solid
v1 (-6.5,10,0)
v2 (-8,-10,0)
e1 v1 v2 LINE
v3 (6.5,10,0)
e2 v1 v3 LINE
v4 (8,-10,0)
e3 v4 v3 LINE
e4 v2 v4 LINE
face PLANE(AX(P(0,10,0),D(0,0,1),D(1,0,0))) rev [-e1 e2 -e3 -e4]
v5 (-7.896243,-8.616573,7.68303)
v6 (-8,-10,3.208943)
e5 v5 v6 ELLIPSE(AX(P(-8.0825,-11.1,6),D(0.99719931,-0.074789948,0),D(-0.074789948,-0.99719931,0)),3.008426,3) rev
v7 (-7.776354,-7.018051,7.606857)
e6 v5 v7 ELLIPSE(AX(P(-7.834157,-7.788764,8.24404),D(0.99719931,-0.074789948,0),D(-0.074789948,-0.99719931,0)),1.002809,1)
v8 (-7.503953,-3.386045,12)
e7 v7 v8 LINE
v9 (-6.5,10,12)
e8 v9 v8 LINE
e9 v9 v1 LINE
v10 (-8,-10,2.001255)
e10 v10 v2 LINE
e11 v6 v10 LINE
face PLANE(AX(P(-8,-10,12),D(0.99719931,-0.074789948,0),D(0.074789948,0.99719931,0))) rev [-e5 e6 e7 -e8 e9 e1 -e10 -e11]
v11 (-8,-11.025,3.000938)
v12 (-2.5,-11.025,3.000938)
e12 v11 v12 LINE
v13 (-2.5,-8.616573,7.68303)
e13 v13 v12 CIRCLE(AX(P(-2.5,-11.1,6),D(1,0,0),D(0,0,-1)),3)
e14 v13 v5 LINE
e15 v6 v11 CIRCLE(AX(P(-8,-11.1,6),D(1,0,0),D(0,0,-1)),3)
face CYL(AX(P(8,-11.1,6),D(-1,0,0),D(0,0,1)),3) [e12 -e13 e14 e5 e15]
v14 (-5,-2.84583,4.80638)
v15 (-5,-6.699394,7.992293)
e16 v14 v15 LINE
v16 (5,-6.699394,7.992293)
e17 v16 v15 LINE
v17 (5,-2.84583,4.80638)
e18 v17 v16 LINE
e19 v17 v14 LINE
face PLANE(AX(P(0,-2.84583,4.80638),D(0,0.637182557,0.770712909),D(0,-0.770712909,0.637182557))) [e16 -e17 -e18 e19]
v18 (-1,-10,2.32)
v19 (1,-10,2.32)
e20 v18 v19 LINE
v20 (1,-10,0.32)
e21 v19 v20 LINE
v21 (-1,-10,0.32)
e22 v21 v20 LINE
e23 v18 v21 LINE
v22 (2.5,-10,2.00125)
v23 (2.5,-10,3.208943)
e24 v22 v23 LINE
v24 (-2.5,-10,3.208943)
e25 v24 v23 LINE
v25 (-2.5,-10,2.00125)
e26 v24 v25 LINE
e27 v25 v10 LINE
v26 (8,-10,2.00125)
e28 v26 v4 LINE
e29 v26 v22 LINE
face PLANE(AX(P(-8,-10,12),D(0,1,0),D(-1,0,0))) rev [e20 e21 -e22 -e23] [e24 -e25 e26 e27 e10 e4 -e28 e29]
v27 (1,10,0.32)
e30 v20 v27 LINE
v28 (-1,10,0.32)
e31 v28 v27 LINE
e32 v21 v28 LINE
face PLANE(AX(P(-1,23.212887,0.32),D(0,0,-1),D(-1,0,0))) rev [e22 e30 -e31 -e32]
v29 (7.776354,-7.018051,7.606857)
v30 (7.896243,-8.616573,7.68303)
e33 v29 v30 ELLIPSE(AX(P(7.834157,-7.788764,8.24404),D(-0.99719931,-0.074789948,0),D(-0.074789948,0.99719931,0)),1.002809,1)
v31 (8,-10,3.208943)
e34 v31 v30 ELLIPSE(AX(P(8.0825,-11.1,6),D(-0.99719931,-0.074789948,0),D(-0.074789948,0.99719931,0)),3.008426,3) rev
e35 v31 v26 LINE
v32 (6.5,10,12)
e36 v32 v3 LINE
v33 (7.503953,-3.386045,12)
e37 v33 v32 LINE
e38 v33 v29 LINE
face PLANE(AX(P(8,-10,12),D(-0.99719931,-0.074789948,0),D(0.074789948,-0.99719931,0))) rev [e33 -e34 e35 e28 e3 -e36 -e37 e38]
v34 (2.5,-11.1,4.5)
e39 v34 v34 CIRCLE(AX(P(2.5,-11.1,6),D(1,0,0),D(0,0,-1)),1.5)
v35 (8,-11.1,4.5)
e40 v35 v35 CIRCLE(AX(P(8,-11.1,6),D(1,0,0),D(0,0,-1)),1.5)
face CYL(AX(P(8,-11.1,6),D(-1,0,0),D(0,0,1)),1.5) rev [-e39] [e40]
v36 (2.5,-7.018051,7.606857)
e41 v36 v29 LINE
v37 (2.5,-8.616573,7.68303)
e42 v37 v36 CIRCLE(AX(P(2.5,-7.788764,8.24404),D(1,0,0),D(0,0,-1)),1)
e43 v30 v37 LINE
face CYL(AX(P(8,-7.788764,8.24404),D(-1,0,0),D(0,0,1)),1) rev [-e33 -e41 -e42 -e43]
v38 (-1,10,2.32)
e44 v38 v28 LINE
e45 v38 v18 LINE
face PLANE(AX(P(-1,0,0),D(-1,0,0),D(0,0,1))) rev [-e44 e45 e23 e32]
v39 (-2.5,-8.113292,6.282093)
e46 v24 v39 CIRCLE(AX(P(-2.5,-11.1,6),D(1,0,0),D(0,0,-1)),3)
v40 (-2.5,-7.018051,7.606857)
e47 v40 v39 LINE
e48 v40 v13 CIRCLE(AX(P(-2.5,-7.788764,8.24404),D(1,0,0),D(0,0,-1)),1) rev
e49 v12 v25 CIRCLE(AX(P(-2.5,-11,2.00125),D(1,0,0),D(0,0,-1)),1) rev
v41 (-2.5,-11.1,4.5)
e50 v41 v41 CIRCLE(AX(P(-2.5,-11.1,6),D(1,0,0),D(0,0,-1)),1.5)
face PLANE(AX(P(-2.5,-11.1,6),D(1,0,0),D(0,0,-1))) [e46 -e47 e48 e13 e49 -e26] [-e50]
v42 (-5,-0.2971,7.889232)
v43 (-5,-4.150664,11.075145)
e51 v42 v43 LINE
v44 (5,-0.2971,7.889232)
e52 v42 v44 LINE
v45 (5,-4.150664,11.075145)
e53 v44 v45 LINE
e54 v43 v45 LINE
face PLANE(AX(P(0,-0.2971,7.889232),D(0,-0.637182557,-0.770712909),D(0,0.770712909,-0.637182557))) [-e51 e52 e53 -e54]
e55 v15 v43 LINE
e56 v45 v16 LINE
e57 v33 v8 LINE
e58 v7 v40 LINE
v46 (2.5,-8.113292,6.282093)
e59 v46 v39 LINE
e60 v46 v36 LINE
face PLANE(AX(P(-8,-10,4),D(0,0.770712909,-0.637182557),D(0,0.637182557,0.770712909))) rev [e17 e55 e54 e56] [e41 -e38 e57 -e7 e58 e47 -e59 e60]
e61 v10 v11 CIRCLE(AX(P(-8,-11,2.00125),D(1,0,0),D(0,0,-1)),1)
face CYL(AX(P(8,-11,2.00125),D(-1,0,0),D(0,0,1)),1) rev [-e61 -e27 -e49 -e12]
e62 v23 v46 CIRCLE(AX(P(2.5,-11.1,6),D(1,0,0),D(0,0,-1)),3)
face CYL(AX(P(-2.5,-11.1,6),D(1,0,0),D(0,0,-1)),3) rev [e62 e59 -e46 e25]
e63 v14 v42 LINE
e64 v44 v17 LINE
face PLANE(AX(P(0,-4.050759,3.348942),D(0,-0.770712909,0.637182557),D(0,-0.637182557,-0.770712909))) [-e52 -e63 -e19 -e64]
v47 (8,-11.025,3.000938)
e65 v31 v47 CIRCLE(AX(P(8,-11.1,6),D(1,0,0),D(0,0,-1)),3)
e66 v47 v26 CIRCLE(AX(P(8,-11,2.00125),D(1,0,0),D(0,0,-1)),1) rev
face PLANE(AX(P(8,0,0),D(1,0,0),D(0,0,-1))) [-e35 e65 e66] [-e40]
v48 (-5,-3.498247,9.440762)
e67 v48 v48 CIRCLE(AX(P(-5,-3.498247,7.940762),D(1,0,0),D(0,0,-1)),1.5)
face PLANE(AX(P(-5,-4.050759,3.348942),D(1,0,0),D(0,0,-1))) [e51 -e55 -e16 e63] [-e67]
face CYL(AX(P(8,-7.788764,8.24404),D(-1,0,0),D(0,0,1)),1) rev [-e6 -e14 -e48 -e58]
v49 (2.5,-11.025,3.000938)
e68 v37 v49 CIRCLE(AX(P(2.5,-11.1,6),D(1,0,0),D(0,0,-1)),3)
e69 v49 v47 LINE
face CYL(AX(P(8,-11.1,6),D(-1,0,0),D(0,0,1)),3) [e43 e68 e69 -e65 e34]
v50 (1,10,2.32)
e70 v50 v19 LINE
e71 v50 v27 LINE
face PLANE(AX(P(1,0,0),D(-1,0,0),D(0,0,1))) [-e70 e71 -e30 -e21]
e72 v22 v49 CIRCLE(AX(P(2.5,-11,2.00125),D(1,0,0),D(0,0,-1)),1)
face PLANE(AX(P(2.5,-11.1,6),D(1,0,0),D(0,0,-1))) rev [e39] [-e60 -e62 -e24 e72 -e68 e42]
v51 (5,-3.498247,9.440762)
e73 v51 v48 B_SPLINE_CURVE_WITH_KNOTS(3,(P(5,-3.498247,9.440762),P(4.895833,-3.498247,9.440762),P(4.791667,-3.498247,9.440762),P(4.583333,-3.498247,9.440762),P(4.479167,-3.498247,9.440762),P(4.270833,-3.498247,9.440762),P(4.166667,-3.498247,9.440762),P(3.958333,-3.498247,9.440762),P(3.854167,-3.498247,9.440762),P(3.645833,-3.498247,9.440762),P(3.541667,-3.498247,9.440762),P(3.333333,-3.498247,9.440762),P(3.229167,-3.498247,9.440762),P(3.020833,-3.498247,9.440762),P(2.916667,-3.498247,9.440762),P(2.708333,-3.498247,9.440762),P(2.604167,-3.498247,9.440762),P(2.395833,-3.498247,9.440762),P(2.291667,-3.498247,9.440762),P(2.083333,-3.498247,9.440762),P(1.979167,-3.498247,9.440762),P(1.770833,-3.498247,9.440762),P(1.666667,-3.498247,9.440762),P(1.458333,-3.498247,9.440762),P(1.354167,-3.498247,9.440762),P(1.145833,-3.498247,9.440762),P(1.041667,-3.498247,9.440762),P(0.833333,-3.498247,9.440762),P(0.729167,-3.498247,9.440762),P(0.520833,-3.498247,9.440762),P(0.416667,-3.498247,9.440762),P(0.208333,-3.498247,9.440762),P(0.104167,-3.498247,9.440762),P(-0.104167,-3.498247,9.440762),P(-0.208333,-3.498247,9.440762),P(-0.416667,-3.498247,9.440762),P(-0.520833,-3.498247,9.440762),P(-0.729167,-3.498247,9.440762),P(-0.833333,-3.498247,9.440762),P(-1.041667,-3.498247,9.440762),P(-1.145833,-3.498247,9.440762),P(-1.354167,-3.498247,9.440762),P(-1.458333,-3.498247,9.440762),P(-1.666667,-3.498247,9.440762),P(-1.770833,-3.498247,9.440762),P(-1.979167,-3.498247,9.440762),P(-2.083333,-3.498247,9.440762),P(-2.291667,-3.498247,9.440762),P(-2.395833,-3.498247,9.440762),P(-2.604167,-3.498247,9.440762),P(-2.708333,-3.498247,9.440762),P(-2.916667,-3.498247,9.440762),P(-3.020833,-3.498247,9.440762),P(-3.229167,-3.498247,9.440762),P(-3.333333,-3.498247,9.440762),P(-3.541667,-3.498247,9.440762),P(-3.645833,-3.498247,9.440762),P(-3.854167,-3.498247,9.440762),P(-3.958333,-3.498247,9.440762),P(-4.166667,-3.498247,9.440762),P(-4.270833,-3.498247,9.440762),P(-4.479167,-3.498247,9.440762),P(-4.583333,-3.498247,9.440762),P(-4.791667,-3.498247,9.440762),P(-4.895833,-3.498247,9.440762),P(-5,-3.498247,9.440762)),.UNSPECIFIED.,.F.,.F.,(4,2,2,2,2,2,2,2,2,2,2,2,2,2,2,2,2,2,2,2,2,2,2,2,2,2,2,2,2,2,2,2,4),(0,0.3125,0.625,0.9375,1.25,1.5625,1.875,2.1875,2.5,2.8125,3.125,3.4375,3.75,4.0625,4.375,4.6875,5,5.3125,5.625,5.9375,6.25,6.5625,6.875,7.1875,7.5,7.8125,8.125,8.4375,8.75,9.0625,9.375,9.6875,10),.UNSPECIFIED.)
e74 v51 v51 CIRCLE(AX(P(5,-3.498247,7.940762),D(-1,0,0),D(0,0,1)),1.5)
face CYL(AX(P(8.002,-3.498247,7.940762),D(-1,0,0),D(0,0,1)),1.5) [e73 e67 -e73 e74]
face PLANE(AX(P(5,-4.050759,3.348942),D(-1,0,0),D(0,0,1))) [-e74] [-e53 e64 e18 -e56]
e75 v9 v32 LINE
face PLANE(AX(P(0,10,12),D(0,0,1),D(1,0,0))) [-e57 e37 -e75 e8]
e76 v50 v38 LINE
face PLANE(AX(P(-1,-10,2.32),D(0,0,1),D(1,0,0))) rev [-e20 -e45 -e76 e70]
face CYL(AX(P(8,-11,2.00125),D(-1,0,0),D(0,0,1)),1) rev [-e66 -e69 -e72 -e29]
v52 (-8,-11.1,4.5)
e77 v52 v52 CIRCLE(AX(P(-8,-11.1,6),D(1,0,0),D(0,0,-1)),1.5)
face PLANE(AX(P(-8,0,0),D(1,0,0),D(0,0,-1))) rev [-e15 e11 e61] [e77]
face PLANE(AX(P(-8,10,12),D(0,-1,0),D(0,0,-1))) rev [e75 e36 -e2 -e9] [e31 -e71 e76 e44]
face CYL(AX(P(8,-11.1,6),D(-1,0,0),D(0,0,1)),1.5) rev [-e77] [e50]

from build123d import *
from build123d.topology import SkipClean

# Parameters (mm, degrees)
BOSS_EXTRUDE1_DEPTH     = 12
CUT_EXTRUDE1_DEPTH      = 22.914607001
CUT_EXTRUDE1_DEPTH_BACK = 22.914607001
SKETCH4_R               = 3
SKETCH4_R_2             = 1.5
BOSS_EXTRUDE2_DEPTH     = 8
SKETCH5_R               = 3
SKETCH5_R_2             = 1.5
CUT_EXTRUDE2_DEPTH      = 2.5
FILLET1_R               = 1
FILLET2_R               = 1
CUT_EXTRUDE3_DEPTH      = 22.914607001
CUT_EXTRUDE3_DEPTH_BACK = 22.914607001
SKETCH6_W               = 12
SKETCH6_H               = 6.5
CUT_EXTRUDE4_DEPTH      = 5
BOSS_EXTRUDE3_REACH     = 24.623
SKETCH8_R               = 1.5
SKETCH9_W               = 2
SKETCH9_H               = 33.212886517
CUT_EXTRUDE5_DEPTH      = 1


with BuildPart() as part:
    # Sketch1 → Boss-Extrude1 (new body)
    with BuildSketch(Plane.XY):
        with BuildLine():
            Line((-8, -10), (8, -10))
            Line((8, -10), (6.5, 10))
            ThreePointArc((6.5, 10), (0, 16.5), (-6.5, 10))
            Line((-6.5, 10), (-8, -10))
        make_face()
    extrude(amount=BOSS_EXTRUDE1_DEPTH)

    # Sketch3 → Cut-Extrude1 (cut, two sides: drawn at the far end of the back side and taken through both)
    with BuildSketch(Plane(origin=(0, 0, 0), x_dir=(0, 0, -1), z_dir=(1, 0, 0)).offset(-CUT_EXTRUDE1_DEPTH_BACK)):
        Polygon((-4, -10), (-12, -3.386045056), (-12, -10), align=None)
    extrude(amount=CUT_EXTRUDE1_DEPTH + CUT_EXTRUDE1_DEPTH_BACK, mode=Mode.SUBTRACT)

    # Sketch4 → Boss-Extrude2 (add, symmetric)
    with BuildSketch(Plane(origin=(0, 0, 0), x_dir=(0, 0, -1), z_dir=(1, 0, 0))):
        with Locations((-6, -11.1)):
            Circle(SKETCH4_R)
        with Locations((-6, -11.1)):
            Circle(SKETCH4_R_2, mode=Mode.SUBTRACT)
    extrude(amount=BOSS_EXTRUDE2_DEPTH, both=True)

    # Sketch5 → Cut-Extrude2 (cut, symmetric)
    with SkipClean():  # the faces are left unmerged after this step: merging them gives an invalid solid
        with BuildSketch(Plane(origin=(0, 0, 0), x_dir=(0, 0, -1), z_dir=(1, 0, 0))):
            with Locations((-6, -11.1)):
                Circle(SKETCH5_R)
            with Locations((-6, -11.1)):
                Circle(SKETCH5_R_2, mode=Mode.SUBTRACT)
        extrude(amount=CUT_EXTRUDE2_DEPTH, both=True, mode=Mode.SUBTRACT)

    # Fillet1
    fillet1_edges = [part.edges().sort_by_distance(p)[0] for p in [
        (5.179248458, -8.113292219, 6.282093298),
        (-5.179248458, -8.113292219, 6.282093298),
    ]]
    fillet(fillet1_edges, radius=FILLET1_R)

    # Fillet2
    # the kernel refuses this fillet: 1 mm, written as the material it adds along each edge
    with BuildSketch(Plane(origin=(-8, -10, 3.208942853), x_dir=(0, 0, -1), z_dir=(1, 0, 0)), Plane(origin=(2.5, -10, 3.208942853), x_dir=(0, 0, -1), z_dir=(1, 0, 0))) as fillet2_piece_1:
        with BuildLine():
            CenterArc((1.207692657, -1), FILLET2_R, 90, 91.432543738)
            ThreePointArc((0.208005206, -1.025), (0.149015506, -0.503365446), (0, 0))
            Line((0, 0), (1.207692657, 0))
        make_face()
    extrude(amount=5.5)

    # Sketch6 → Cut-Extrude3 (cut, two sides: drawn at the far end of the back side and taken through both)
    with BuildSketch(Plane(origin=(0, 0, 0), x_dir=(0, 0, -1), z_dir=(1, 0, 0)).offset(-CUT_EXTRUDE3_DEPTH_BACK)):
        with Locations((-6, 13.25)):
            Rectangle(SKETCH6_W, SKETCH6_H)
    extrude(amount=CUT_EXTRUDE3_DEPTH + CUT_EXTRUDE3_DEPTH_BACK, mode=Mode.SUBTRACT)

    # Sketch7 → Cut-Extrude4 (cut)
    with BuildSketch(Plane(origin=(0, -7.904323178, 6.53485467), x_dir=(1, 0, 0), z_dir=(0, -0.770712909441233, 0.6371825572162423))):
        Polygon((-5, 5.891026066), (0, 5.891026066), (5, 5.891026066), (5, 1.891026066), (-5, 1.891026066), align=None)
    extrude(amount=-CUT_EXTRUDE4_DEPTH, mode=Mode.SUBTRACT)

    # Sketch8 → Boss-Extrude3 (add, up to next)
    with BuildSketch(Plane(origin=(-5, 0, 0), x_dir=(0, 0, -1), z_dir=(1, 0, 0)), mode=Mode.PRIVATE) as boss_extrude3_sk1:
        with Locations(Location((-7.940762297, -3.498246966, 0), (0, 0, 180))):
            Circle(SKETCH8_R)
    boss_extrude3_tool1 = extrude(boss_extrude3_sk1.sketch, amount=BOSS_EXTRUDE3_REACH, mode=Mode.PRIVATE) - part.part
    add(boss_extrude3_tool1.solids().sort_by_distance((-5, -3.498247, 7.940762))[0])

    # Sketch9 → Cut-Extrude5 (cut, symmetric)
    with BuildSketch(Plane(origin=(0, 0, 0), x_dir=(0, 0, -1), z_dir=(1, 0, 0))):
        with Locations((-1.32, 6.606443259)):
            Rectangle(SKETCH9_W, SKETCH9_H)
    extrude(amount=CUT_EXTRUDE5_DEPTH, both=True, mode=Mode.SUBTRACT)


solid = part.part
